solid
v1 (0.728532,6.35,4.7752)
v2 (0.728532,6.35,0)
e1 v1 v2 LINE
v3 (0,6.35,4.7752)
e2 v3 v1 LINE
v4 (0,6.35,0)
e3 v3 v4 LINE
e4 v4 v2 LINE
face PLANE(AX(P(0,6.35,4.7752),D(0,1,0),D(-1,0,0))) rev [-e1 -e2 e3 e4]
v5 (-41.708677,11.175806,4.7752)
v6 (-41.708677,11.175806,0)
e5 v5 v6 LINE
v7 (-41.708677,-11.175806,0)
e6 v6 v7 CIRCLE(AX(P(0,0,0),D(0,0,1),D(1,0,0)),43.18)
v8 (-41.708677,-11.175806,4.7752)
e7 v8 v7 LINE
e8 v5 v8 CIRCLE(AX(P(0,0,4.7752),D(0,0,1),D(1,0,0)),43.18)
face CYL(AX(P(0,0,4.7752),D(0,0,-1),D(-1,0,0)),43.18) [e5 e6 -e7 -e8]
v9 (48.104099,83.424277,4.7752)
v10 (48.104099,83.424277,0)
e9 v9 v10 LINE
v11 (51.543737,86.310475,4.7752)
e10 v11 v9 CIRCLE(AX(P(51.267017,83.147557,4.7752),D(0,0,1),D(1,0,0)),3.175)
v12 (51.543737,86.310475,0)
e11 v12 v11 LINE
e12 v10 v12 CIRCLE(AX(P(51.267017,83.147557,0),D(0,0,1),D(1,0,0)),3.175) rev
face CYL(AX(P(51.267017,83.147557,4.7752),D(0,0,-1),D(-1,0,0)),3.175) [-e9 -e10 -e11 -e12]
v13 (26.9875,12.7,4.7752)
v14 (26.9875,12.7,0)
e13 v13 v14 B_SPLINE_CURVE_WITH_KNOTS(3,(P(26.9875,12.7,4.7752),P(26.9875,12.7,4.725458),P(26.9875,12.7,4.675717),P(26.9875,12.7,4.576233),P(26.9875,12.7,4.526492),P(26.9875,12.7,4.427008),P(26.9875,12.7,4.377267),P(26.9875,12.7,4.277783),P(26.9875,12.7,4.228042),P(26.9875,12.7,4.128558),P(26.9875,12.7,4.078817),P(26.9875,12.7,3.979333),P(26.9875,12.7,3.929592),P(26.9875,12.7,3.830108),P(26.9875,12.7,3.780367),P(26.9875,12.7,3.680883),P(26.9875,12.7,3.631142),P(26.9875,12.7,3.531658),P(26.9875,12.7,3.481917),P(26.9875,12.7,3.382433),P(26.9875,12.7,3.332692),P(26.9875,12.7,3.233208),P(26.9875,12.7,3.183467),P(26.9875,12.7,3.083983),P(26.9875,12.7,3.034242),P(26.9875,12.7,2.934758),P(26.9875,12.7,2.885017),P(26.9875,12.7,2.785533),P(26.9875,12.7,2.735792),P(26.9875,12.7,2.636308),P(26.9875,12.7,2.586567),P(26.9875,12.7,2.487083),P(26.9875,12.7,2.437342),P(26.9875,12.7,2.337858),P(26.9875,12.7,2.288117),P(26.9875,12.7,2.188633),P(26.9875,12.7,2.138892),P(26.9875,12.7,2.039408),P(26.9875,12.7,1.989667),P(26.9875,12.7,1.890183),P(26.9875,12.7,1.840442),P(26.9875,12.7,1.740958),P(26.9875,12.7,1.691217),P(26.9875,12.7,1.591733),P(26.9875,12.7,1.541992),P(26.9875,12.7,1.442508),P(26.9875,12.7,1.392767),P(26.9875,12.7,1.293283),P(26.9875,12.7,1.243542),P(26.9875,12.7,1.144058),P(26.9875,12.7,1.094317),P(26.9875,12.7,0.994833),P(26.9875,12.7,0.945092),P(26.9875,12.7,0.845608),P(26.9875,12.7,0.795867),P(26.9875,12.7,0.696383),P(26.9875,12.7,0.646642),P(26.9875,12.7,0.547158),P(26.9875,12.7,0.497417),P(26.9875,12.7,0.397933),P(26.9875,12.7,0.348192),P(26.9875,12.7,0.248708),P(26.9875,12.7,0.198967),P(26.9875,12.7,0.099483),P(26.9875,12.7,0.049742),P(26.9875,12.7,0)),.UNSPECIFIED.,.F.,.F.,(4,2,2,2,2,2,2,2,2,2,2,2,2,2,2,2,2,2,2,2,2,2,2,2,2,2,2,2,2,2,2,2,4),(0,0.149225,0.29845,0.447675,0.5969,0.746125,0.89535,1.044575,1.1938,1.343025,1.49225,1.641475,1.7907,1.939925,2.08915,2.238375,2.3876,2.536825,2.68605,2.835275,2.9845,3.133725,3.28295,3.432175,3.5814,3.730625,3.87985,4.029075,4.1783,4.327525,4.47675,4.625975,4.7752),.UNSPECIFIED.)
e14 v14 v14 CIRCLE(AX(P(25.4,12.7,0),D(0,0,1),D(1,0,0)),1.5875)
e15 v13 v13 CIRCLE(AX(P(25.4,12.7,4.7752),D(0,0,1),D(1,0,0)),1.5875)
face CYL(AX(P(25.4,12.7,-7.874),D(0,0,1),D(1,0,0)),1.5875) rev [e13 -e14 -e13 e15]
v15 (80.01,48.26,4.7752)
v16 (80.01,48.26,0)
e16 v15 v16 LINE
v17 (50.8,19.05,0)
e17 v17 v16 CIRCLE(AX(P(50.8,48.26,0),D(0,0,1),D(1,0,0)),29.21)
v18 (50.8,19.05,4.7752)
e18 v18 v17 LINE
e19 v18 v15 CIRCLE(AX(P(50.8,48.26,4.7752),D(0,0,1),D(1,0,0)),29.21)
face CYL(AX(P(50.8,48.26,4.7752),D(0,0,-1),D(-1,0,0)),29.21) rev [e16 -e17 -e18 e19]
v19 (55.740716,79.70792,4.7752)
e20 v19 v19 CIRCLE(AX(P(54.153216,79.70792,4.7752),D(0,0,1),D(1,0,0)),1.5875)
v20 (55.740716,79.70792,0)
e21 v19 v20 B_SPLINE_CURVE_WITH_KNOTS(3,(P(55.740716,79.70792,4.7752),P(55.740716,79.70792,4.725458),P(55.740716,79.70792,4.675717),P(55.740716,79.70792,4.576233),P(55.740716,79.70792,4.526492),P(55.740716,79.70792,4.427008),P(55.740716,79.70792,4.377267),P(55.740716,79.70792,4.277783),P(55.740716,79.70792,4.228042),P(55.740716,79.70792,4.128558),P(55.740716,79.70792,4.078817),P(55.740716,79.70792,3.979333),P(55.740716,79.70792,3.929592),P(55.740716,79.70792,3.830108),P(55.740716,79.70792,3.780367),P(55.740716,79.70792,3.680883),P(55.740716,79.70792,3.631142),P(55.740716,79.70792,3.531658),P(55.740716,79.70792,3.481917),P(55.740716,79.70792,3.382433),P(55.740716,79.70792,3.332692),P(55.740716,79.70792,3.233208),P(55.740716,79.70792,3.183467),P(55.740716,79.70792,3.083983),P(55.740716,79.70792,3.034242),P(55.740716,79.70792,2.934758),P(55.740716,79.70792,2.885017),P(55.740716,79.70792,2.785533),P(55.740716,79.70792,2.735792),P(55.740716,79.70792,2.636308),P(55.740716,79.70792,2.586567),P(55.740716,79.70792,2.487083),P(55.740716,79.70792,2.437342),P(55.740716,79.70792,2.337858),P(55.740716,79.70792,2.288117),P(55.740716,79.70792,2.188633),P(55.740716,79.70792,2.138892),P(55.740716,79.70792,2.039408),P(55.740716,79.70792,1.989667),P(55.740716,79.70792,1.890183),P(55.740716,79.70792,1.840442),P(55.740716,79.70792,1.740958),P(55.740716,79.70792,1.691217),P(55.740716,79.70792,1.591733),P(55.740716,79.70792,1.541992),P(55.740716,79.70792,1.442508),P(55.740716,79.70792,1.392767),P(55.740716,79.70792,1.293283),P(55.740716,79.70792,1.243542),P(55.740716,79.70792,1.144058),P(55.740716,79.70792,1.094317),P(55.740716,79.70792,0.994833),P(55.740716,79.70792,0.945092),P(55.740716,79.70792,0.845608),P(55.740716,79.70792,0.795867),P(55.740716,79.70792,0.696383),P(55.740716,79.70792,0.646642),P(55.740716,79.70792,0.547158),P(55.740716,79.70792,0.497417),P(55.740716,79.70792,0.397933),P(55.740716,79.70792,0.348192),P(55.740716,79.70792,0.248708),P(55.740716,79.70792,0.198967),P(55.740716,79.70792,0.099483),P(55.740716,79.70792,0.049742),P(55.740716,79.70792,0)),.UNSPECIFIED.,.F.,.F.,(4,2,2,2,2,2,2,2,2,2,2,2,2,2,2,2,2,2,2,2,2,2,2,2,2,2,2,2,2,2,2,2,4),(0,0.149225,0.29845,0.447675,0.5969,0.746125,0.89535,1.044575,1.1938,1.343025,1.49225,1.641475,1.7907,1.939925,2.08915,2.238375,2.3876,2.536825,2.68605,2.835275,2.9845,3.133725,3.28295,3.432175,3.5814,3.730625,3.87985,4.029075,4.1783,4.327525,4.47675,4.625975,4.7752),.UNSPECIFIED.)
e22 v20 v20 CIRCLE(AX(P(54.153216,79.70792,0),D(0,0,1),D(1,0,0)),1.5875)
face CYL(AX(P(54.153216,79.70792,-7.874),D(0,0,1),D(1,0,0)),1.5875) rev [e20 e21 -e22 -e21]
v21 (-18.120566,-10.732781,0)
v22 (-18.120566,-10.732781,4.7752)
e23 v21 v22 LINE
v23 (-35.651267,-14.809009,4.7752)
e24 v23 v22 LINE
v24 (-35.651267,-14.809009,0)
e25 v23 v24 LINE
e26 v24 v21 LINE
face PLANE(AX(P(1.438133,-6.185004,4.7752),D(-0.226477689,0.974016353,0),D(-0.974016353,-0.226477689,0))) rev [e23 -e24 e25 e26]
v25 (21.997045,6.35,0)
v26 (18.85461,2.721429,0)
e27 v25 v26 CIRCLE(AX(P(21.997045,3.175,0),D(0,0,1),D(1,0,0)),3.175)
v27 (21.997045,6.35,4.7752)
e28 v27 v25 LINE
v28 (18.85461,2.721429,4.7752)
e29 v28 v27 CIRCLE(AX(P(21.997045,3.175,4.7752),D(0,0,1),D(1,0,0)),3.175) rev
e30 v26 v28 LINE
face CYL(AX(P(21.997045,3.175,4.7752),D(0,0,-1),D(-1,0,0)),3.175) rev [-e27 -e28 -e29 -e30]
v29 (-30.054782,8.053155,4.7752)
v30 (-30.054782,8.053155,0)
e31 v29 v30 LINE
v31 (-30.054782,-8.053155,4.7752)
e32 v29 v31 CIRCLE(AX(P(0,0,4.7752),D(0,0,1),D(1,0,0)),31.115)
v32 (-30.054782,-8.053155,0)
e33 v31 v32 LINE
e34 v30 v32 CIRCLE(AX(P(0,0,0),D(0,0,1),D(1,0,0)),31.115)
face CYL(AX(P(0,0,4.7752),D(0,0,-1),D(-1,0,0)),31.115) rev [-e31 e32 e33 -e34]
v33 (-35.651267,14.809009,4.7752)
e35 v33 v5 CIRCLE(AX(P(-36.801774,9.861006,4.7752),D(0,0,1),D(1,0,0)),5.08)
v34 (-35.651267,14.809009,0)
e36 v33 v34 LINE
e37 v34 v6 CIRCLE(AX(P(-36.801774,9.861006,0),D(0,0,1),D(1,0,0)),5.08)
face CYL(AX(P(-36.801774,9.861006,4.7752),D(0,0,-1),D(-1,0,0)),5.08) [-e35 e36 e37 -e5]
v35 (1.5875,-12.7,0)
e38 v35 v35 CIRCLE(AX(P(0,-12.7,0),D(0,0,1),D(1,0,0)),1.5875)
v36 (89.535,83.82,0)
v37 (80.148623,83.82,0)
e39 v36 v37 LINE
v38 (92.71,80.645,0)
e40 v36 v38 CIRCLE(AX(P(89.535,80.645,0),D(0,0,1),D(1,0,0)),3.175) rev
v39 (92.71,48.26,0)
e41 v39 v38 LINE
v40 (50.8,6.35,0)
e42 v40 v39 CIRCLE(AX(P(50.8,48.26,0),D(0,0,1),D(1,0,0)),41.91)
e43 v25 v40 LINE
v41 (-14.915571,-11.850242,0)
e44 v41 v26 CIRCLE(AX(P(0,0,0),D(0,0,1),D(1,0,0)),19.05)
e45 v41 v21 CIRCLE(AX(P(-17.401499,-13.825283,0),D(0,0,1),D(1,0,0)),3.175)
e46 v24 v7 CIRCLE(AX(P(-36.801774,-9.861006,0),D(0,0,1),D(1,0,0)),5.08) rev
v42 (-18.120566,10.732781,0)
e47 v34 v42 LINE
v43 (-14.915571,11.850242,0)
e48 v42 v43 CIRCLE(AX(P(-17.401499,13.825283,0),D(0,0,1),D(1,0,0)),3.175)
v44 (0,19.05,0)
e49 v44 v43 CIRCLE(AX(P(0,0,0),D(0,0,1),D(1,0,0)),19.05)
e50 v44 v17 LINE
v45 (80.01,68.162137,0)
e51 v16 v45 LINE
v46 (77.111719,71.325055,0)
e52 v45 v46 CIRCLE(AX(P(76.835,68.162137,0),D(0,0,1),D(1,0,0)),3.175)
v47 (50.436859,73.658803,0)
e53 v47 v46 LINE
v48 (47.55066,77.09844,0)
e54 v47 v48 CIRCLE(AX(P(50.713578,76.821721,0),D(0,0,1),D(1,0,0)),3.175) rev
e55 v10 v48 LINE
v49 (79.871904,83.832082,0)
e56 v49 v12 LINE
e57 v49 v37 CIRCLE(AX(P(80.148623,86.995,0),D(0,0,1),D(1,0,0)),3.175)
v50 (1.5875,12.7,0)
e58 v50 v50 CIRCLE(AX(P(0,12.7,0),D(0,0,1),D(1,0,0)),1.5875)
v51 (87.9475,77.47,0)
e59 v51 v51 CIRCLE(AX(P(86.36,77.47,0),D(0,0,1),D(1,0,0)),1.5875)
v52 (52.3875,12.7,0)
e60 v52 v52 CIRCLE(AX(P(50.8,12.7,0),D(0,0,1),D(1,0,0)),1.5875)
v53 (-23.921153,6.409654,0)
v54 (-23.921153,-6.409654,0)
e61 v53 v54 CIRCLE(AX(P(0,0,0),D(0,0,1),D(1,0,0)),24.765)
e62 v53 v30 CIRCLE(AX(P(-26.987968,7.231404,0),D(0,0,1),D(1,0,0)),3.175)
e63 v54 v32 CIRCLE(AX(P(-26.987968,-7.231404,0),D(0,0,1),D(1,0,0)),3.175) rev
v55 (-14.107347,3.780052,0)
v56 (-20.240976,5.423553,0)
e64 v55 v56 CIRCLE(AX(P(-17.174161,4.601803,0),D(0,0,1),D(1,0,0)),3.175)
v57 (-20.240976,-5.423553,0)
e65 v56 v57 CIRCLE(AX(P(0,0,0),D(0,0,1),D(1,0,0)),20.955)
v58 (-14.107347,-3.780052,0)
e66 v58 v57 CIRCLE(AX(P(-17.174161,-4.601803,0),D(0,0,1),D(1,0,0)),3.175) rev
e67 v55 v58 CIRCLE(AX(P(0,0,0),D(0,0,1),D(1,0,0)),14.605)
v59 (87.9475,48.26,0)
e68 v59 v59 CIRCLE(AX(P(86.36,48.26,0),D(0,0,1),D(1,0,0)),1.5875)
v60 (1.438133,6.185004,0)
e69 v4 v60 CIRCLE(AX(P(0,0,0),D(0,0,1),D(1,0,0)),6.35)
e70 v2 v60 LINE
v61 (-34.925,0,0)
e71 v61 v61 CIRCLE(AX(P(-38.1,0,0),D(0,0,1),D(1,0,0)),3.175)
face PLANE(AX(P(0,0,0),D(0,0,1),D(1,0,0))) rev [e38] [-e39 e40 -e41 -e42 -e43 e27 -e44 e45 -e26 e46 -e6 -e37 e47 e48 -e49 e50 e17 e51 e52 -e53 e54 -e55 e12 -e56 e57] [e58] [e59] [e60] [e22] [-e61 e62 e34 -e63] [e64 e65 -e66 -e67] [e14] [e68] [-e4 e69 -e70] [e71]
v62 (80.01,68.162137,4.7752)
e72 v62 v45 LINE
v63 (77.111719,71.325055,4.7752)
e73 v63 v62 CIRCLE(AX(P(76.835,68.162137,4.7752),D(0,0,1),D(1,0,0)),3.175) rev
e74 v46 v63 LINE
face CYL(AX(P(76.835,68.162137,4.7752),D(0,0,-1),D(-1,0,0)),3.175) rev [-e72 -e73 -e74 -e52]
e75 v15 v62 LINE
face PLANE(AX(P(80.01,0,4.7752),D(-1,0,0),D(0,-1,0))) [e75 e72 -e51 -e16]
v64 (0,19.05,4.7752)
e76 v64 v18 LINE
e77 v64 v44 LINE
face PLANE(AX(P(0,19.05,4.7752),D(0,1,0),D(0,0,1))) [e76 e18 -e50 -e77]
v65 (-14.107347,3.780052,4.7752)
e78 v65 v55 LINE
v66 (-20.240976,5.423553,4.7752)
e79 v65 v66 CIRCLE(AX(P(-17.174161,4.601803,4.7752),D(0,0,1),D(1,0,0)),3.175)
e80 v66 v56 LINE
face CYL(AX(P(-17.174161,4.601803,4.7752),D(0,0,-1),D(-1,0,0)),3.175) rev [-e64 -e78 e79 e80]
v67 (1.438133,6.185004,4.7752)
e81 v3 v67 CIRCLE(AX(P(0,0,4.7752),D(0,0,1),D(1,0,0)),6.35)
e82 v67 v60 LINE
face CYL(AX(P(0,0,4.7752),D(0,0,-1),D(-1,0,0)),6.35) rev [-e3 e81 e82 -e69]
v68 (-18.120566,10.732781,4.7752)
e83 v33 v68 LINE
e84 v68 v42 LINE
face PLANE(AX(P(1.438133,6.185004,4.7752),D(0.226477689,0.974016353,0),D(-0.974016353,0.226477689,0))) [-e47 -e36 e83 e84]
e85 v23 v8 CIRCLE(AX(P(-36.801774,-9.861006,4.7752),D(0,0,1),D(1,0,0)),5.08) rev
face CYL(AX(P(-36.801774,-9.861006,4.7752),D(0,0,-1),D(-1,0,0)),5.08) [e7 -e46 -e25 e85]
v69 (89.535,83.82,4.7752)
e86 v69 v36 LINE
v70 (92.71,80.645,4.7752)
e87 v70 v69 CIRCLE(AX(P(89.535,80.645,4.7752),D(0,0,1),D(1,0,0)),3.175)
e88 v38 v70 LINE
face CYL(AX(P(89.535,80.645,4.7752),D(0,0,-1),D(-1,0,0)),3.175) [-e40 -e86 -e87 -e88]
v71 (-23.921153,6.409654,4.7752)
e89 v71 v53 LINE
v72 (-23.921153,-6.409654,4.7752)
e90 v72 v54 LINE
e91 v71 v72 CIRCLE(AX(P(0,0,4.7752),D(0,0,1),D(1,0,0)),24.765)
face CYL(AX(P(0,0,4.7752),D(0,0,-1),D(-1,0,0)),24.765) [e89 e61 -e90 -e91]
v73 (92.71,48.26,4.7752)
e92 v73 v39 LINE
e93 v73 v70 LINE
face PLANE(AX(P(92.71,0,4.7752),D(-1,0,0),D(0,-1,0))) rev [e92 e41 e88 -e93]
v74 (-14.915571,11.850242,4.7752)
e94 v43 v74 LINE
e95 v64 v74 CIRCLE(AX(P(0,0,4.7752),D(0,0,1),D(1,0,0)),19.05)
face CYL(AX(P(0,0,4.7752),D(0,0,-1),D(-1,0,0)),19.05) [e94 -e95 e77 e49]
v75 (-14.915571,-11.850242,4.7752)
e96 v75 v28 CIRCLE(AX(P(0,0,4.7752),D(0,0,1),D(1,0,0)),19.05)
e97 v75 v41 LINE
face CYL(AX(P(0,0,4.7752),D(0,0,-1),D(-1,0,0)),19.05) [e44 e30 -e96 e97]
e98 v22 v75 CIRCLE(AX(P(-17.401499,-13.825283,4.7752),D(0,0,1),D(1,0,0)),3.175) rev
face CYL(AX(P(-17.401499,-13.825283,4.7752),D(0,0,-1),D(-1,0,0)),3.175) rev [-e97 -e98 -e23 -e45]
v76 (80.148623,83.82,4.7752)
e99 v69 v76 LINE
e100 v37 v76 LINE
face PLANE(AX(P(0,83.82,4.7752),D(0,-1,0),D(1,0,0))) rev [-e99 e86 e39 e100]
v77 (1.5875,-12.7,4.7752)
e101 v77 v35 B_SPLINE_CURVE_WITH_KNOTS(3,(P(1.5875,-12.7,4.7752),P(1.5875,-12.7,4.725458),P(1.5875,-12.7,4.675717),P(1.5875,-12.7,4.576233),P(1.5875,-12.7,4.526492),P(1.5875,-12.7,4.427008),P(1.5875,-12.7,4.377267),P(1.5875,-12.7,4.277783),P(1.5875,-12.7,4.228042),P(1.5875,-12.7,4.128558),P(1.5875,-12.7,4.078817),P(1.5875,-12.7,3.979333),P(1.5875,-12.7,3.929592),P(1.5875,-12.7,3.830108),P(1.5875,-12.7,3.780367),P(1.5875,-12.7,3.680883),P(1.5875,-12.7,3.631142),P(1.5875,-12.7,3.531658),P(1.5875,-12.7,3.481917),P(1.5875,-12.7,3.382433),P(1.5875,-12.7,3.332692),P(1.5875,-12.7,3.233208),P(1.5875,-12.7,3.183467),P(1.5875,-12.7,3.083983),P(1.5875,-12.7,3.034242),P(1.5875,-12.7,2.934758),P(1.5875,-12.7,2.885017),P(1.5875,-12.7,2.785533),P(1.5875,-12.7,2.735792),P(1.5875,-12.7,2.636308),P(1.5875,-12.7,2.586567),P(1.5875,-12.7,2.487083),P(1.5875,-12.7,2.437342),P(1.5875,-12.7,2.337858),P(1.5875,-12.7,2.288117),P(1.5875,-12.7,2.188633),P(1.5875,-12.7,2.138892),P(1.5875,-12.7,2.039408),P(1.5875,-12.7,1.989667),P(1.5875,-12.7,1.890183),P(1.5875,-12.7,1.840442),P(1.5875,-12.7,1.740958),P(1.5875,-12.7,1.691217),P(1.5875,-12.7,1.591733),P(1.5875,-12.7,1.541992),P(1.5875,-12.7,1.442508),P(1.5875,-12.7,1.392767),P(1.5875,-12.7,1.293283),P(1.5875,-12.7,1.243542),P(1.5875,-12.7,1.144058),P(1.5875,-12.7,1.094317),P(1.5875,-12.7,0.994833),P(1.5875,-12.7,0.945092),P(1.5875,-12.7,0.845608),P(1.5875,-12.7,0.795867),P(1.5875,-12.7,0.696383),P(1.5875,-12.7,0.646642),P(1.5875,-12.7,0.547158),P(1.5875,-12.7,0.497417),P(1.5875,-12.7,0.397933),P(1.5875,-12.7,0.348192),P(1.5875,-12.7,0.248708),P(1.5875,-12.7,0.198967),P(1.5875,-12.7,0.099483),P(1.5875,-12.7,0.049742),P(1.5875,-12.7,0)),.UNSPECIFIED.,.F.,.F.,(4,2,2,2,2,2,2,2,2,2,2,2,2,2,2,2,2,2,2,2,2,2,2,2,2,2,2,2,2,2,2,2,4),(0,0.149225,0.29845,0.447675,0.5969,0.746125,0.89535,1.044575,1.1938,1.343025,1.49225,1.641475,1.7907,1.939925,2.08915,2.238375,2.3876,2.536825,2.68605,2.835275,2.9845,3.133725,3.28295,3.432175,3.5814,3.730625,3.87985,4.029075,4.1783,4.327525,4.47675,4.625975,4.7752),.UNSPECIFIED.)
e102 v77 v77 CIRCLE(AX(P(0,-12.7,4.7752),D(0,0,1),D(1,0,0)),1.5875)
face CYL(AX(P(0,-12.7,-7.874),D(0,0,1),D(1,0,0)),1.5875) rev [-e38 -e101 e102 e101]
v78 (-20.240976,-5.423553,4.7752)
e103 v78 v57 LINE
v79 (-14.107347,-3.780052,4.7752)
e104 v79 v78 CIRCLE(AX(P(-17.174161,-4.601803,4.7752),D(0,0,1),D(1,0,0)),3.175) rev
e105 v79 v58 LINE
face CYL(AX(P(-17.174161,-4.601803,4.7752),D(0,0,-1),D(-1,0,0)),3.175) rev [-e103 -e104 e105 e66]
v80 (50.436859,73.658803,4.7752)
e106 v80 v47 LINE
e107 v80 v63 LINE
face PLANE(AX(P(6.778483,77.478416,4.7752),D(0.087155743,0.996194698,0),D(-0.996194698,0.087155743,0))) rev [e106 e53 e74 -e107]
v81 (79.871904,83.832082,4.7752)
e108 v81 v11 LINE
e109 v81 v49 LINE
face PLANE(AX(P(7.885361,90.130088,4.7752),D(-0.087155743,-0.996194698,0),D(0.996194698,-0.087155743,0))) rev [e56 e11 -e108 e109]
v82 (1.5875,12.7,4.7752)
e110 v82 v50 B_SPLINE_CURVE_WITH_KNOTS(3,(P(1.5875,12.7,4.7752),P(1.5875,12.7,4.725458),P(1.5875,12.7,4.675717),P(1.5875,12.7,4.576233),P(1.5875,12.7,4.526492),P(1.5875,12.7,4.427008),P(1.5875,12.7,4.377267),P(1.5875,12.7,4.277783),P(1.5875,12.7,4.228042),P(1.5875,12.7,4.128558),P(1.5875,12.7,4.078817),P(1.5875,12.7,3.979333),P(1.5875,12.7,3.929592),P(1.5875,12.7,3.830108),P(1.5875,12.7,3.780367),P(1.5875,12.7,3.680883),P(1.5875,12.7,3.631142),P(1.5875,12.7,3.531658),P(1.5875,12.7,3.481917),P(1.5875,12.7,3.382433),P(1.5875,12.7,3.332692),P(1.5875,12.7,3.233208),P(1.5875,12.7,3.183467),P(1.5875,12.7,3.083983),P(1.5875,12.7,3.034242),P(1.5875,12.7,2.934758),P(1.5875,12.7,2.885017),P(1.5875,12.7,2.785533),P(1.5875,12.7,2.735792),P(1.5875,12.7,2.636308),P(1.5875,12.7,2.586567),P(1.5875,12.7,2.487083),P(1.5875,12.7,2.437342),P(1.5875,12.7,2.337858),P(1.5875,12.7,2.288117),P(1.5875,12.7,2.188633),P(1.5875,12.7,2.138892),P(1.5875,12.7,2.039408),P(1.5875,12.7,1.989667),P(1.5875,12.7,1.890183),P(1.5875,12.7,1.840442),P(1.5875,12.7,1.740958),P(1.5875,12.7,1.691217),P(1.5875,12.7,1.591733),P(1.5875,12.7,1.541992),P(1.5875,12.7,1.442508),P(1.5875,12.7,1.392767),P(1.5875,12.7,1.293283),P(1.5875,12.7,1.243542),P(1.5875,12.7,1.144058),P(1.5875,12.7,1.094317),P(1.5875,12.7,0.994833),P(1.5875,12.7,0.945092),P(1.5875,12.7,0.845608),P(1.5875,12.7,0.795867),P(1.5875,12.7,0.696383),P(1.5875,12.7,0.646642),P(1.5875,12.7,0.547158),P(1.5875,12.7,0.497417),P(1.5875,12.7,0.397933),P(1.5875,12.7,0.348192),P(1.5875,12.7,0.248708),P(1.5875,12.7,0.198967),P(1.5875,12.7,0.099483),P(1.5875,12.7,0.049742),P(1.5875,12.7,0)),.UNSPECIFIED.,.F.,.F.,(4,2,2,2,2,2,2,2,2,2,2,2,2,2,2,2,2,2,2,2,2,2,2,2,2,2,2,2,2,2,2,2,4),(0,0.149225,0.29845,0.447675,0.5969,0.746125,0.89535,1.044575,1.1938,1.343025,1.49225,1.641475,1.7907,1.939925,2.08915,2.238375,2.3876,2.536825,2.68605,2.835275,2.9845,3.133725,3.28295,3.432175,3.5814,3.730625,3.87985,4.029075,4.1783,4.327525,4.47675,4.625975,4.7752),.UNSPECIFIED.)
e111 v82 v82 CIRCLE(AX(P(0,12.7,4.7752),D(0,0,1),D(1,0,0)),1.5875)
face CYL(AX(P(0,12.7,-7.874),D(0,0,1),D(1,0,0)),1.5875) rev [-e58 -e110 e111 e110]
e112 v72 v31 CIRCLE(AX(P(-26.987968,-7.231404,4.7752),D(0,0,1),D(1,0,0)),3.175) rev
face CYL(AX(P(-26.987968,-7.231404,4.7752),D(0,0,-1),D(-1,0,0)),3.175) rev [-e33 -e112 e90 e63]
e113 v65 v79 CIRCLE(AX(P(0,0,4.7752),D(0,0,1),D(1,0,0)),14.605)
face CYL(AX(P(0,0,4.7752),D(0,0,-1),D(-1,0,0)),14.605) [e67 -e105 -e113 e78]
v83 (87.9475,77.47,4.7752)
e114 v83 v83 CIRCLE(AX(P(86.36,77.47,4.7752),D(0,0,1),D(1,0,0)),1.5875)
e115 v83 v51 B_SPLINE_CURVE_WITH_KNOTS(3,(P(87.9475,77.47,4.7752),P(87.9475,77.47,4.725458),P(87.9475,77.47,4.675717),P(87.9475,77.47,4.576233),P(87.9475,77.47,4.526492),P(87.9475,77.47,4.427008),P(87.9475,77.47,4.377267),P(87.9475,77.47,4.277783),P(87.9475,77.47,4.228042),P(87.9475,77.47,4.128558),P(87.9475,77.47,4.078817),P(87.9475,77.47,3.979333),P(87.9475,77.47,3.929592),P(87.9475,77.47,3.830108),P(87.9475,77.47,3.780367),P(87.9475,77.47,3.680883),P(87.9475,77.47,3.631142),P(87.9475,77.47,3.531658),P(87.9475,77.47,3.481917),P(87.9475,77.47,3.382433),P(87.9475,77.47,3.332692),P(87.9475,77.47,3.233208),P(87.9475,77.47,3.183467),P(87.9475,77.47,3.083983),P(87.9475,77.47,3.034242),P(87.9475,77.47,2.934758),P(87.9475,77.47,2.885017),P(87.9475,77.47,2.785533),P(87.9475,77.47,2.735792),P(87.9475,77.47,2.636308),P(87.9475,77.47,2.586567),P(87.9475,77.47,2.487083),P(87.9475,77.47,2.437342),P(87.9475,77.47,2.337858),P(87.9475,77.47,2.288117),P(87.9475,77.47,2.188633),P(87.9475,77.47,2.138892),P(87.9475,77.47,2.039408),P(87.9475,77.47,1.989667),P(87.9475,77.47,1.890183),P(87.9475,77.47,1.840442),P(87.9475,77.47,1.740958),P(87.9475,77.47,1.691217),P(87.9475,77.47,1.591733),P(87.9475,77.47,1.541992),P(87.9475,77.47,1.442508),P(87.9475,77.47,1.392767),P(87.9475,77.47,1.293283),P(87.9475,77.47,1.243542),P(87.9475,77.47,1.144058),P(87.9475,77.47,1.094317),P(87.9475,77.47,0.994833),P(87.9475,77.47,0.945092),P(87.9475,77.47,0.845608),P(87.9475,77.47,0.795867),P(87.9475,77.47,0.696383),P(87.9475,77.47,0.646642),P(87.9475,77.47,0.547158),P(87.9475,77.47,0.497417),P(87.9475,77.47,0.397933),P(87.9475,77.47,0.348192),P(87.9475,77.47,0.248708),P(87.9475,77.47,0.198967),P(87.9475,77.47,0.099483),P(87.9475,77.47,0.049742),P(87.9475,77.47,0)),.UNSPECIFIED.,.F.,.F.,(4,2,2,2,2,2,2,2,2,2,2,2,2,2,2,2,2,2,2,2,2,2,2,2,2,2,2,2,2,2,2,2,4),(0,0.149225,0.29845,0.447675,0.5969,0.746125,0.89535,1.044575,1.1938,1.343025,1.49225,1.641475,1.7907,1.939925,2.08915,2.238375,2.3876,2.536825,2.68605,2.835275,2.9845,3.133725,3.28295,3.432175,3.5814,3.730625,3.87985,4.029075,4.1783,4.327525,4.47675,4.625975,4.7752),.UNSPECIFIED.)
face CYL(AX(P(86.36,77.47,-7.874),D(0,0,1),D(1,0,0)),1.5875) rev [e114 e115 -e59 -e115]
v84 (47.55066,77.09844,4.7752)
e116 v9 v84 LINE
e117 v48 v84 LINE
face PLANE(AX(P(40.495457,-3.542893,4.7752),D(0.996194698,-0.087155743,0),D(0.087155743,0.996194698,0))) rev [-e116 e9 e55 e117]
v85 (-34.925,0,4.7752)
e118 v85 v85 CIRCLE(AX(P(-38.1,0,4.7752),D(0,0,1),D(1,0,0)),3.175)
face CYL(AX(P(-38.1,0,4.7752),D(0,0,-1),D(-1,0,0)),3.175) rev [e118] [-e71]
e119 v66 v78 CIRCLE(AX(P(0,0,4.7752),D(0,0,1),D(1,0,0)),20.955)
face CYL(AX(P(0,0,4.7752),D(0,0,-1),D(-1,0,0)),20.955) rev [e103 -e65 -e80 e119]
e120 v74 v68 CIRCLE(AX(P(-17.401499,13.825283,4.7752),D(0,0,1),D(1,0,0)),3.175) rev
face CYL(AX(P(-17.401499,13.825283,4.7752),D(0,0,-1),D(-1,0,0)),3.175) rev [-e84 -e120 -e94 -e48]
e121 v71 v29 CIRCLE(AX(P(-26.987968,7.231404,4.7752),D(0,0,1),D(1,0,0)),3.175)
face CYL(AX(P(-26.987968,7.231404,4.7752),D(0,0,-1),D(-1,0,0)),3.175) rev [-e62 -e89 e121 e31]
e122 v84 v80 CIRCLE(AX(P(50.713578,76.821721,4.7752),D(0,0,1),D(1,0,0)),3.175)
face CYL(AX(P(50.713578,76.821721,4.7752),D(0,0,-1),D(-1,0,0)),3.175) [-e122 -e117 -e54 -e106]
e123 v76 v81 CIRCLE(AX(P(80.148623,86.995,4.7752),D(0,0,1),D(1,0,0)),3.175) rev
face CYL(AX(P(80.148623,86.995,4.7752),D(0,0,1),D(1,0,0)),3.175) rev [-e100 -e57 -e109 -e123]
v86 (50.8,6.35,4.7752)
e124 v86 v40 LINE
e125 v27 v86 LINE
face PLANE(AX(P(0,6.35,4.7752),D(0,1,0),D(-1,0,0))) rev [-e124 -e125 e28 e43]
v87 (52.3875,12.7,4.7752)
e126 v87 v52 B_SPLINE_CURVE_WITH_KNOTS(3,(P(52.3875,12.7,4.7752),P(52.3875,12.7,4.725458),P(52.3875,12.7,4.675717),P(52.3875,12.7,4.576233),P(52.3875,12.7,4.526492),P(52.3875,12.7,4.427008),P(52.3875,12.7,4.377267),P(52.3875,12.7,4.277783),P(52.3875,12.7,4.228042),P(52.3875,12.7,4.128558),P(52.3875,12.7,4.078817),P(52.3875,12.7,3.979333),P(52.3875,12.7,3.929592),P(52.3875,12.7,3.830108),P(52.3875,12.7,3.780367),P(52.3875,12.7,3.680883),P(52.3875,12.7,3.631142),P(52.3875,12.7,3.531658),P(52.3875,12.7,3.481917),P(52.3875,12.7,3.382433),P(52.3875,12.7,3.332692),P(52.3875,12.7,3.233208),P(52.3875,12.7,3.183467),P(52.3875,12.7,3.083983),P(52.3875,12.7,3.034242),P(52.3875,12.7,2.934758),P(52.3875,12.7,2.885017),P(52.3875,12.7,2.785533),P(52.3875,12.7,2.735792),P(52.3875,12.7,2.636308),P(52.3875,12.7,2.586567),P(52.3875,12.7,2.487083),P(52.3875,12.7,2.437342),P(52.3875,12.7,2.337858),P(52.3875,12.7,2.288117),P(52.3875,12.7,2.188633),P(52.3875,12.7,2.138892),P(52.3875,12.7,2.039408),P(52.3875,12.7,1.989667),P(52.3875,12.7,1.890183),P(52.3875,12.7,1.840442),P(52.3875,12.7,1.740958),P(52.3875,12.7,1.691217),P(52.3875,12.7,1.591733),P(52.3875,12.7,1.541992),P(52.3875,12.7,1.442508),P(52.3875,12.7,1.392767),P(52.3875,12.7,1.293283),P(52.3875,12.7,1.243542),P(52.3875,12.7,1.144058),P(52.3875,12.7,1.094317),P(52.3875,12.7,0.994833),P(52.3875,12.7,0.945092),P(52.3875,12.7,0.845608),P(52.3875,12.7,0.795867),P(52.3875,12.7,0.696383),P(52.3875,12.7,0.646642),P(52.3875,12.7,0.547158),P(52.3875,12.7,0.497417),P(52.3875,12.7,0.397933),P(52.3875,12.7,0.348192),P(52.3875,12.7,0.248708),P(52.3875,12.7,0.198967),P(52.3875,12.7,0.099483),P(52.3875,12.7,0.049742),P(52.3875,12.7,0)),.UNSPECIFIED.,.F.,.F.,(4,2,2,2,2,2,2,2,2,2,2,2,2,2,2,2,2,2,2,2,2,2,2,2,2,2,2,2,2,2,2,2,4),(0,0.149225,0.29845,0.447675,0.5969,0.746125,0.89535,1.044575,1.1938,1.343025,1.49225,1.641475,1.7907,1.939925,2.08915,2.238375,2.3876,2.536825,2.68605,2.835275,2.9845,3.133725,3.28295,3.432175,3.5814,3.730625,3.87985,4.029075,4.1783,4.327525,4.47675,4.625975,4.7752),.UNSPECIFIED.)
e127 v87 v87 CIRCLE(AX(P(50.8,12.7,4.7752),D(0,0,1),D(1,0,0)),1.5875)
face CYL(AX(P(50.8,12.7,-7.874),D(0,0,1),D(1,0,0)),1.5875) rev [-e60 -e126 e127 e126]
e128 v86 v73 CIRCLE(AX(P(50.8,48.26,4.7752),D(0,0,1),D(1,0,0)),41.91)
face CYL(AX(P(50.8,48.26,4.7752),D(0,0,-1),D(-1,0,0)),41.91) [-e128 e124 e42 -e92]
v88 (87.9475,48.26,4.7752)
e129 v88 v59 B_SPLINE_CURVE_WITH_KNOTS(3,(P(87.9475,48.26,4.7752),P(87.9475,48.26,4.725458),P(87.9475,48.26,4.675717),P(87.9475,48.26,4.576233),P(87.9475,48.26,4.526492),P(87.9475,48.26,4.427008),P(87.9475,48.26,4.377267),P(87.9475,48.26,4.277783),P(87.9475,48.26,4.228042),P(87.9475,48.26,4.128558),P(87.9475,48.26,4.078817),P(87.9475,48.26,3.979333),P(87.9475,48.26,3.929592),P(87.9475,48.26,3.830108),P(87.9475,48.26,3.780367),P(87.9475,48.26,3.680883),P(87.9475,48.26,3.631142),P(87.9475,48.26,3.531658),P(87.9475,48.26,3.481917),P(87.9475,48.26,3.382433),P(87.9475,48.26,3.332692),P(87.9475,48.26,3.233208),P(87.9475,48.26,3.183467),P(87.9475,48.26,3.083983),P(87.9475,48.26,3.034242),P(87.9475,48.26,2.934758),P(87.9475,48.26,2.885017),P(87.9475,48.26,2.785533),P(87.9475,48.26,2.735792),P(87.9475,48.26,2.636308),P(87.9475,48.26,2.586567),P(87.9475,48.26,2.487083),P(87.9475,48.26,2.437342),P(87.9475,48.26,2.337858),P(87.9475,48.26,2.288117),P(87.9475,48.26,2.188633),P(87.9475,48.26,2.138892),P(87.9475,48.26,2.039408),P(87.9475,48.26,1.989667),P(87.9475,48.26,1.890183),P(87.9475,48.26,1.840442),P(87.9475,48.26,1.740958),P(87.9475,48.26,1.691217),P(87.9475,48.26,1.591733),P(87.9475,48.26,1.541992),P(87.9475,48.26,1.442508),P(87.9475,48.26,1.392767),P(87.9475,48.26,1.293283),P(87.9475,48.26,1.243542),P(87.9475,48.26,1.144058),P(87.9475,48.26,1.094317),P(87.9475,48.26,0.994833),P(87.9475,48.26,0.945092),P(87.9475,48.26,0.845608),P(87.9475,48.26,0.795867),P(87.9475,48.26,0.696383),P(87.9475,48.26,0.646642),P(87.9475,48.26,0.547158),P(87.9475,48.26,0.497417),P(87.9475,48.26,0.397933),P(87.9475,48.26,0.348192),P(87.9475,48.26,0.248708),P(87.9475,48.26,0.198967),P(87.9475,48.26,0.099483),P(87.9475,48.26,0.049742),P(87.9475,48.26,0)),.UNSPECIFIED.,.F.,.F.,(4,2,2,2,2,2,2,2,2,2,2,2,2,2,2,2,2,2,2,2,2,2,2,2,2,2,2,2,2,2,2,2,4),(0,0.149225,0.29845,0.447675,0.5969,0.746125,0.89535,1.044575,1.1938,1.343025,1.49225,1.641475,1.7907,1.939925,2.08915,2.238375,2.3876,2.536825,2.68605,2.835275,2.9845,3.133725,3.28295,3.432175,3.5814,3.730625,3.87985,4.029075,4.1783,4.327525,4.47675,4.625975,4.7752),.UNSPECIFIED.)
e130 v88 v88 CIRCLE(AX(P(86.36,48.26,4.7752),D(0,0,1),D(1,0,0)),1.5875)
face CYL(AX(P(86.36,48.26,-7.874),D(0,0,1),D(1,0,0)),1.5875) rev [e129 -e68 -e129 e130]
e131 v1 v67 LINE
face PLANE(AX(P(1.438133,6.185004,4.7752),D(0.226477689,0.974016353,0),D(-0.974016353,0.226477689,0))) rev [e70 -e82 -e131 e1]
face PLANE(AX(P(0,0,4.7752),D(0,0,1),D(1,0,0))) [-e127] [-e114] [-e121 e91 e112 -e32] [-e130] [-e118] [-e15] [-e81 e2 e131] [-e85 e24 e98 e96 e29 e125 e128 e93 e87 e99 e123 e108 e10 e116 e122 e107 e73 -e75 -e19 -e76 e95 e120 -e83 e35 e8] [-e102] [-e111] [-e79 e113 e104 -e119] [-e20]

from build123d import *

# Parameters (mm, degrees)
SKETCH1_R           = 3.175
BOSS_EXTRUDE1_DEPTH = 4.7752
FILLET1_R           = 3.175
SKETCH2_R           = 1.5875
CUT_EXTRUDE2_DEPTH  = 12.6492


with BuildPart() as part:
    # Sketch1 → Boss-Extrude1 (new body)
    with BuildSketch(Plane.XY):
        with BuildLine():
            ThreePointArc((-41.708677179, -11.175806368), (-39.414754754, -14.217464212), (-35.65126732, -14.809008693))
            Line((-35.65126732, -14.809008693), (-16.055699309, -10.252659153))
            ThreePointArc((-16.055699309, -10.252659153), (8.35578547, -17.119677251), (17.960512242, 6.35))
            Line((17.960512242, 6.35), (50.8, 6.35))
            ThreePointArc((50.8, 6.35), (80.4348452, 18.6251548), (92.71, 48.26))
            Line((92.71, 48.26), (92.71, 83.82))
            Line((92.71, 83.82), (80.01, 83.82))
            Line((80.01, 83.82), (48.380818336, 86.587194832))
            Line((48.380818336, 86.587194832), (47.273940403, 73.935522166))
            Line((47.273940403, 73.935522166), (80.01, 71.071488063))
            Line((80.01, 71.071488063), (80.01, 48.26))
            ThreePointArc((80.01, 48.26), (71.454589078, 27.605410922), (50.8, 19.05))
            Line((50.8, 19.05), (0, 19.05))
            ThreePointArc((0, 19.05), (-9.153942952, 16.706520536), (-16.055699309, 10.252659153))
            Line((-16.055699309, 10.252659153), (-35.65126732, 14.809008693))
            ThreePointArc((-35.65126732, 14.809008693), (-39.414754754, 14.217464212), (-41.708677179, 11.175806368))
            ThreePointArc((-41.708677179, 11.175806368), (-43.18, 0), (-41.708677179, -11.175806368))
        make_face()
        with BuildLine():
            ThreePointArc((-23.921153088, -6.409653652), (-26.166217118, -10.298218619), (-30.054782085, -8.053154588))
            ThreePointArc((-30.054782085, -8.053154588), (-31.115, 0), (-30.054782085, 8.053154588))
            ThreePointArc((-30.054782085, 8.053154588), (-26.166217118, 10.298218619), (-23.921153088, 6.409653652))
            ThreePointArc((-23.921153088, 6.409653652), (-24.765, 0), (-23.921153088, -6.409653652))
        make_face(mode=Mode.SUBTRACT)
        with BuildLine():
            ThreePointArc((-20.24097569, -5.42355309), (-20.955, 0), (-20.24097569, 5.42355309))
            ThreePointArc((-20.24097569, 5.42355309), (-16.352410723, 7.66861712), (-14.107346693, 3.780052154))
            ThreePointArc((-14.107346693, 3.780052154), (-14.605, 0), (-14.107346693, -3.780052154))
            ThreePointArc((-14.107346693, -3.780052154), (-16.352410723, -7.66861712), (-20.24097569, -5.42355309))
        make_face(mode=Mode.SUBTRACT)
        with Locations((-38.1, 0)):
            Circle(SKETCH1_R, mode=Mode.SUBTRACT)
        with BuildLine():
            ThreePointArc((1.438133327, 6.185003843), (-0.723783669, -6.308616108), (0, 6.35))
            Line((0, 6.35), (0.728531617, 6.35))
            Line((0.728531617, 6.35), (1.438133327, 6.185003843))
        make_face(mode=Mode.SUBTRACT)
    extrude(amount=BOSS_EXTRUDE1_DEPTH)

    # Fillet1
    # the kernel refuses this fillet: 3.175 mm, written as the material it adds along each edge
    with BuildSketch(Plane(origin=(-16.055699309, 10.252659153, 0), x_dir=(0.5808999309278821, 0.8139749813403246, 0), z_dir=(0, 0, 1))) as fillet1_piece_1:
        with BuildLine():
            CenterArc((2.126250916, 3.170784423), FILLET1_R, 202.42407708, 64.623066475)
            Line((-0.808674052, 1.959652545), (0, 0))
            ThreePointArc((0, 0), (0.981346577, 0.025293461), (1.962693154, 0))
        make_face()
    extrude(amount=4.7752)
    with BuildSketch(Plane(origin=(80.01, 71.071488063, 0), x_dir=(-0.9961946980917454, 0.08715574274765892, 0), z_dir=(0, 0, 1))) as fillet1_piece_2:
        with BuildLine():
            CenterArc((FILLET1_R * 0.916331174017, FILLET1_R), FILLET1_R, 185, 85)
            Line((-FILLET1_R * 0.0798635240743, FILLET1_R * 0.912844257252), (0, 0))
            Line((0, 0), (FILLET1_R * 0.916331174017, 0))
        make_face()
    extrude(amount=4.7752)
    with BuildSketch(Plane(origin=(80.01, 83.82, 0), x_dir=(1, 0, 0), z_dir=(0, 0, 1))) as fillet1_piece_3:
        with BuildLine():
            CenterArc((FILLET1_R * 0.0436609429085, FILLET1_R), FILLET1_R, 265, 5)
            Line((-FILLET1_R * 0.0434947998391, FILLET1_R * 0.00380530190826), (0, 0))
            Line((0, 0), (FILLET1_R * 0.0436609429085, 0))
        make_face()
    extrude(amount=4.7752)
    with BuildSketch(Plane(origin=(17.960512242, 6.35, 0), x_dir=(0.23924892683917381, -0.9709582642968253, 0), z_dir=(0, 0, 1))) as fillet1_piece_4:
        with BuildLine():
            CenterArc((4.048528681, 3.159689746), FILLET1_R, 166.157784332, 98.213210702)
            Line((0.965736192, 3.919305089), (0, 0))
            ThreePointArc((0, 0), (1.868551699, 0.091861522), (3.737103398, 0))
        make_face()
    extrude(amount=4.7752)
    with BuildSketch(Plane(origin=(-16.055699309, -10.252659153, 0), x_dir=(-0.9740163531879217, -0.22647768923781808, 0), z_dir=(0, 0, 1))) as fillet1_piece_5:
        with BuildLine():
            CenterArc((2.1199509, 3.175), FILLET1_R, 205.376933525, 64.623066475)
            ThreePointArc((-0.748686692, 1.814285714), (-0.350962429, 0.916791272), (0, 0))
            Line((0, 0), (2.1199509, 0))
        make_face()
    extrude(amount=4.7752)
    # the kernel refuses this fillet: 3.175 mm, written as the material it takes off along each edge
    with BuildSketch(Plane(origin=(47.273940403, 73.935522166, -7.9375), x_dir=(0.0871557427476583, 0.9961946980917454, 0), z_dir=(0, 0, 1)), Plane(origin=(48.380818336, 86.587194832, -7.9375), x_dir=(0.9961946980917455, -0.08715574274765811, 0), z_dir=(0, 0, 1)), Plane(origin=(92.71, 83.82, -7.9375), x_dir=(0, -1, 0), z_dir=(0, 0, 1))) as fillet1_2_piece_1:
        with BuildLine():
            CenterArc((FILLET1_R, -FILLET1_R), FILLET1_R, 90, 90)
            Line((0, -FILLET1_R), (0, 0))
            Line((0, 0), (FILLET1_R, 0))
        make_face()
    extrude(amount=20.6502, mode=Mode.SUBTRACT)

    # Sketch2 → Cut-Extrude2 (cut)
    with BuildSketch(Plane.XY.offset(4.7752)):
        with Locations((0, 12.7)):
            Circle(SKETCH2_R)
        with Locations((0, -12.7)):
            Circle(SKETCH2_R)
        with Locations((25.4, 12.7)):
            Circle(SKETCH2_R)
        with Locations((54.153215702, 79.707919533)):
            Circle(SKETCH2_R)
        with Locations((50.8, 12.7)):
            Circle(SKETCH2_R)
        with Locations((86.36, 77.47)):
            Circle(SKETCH2_R)
        with Locations((86.36, 48.26)):
            Circle(SKETCH2_R)
    extrude(amount=-CUT_EXTRUDE2_DEPTH, mode=Mode.SUBTRACT)


solid = part.part
